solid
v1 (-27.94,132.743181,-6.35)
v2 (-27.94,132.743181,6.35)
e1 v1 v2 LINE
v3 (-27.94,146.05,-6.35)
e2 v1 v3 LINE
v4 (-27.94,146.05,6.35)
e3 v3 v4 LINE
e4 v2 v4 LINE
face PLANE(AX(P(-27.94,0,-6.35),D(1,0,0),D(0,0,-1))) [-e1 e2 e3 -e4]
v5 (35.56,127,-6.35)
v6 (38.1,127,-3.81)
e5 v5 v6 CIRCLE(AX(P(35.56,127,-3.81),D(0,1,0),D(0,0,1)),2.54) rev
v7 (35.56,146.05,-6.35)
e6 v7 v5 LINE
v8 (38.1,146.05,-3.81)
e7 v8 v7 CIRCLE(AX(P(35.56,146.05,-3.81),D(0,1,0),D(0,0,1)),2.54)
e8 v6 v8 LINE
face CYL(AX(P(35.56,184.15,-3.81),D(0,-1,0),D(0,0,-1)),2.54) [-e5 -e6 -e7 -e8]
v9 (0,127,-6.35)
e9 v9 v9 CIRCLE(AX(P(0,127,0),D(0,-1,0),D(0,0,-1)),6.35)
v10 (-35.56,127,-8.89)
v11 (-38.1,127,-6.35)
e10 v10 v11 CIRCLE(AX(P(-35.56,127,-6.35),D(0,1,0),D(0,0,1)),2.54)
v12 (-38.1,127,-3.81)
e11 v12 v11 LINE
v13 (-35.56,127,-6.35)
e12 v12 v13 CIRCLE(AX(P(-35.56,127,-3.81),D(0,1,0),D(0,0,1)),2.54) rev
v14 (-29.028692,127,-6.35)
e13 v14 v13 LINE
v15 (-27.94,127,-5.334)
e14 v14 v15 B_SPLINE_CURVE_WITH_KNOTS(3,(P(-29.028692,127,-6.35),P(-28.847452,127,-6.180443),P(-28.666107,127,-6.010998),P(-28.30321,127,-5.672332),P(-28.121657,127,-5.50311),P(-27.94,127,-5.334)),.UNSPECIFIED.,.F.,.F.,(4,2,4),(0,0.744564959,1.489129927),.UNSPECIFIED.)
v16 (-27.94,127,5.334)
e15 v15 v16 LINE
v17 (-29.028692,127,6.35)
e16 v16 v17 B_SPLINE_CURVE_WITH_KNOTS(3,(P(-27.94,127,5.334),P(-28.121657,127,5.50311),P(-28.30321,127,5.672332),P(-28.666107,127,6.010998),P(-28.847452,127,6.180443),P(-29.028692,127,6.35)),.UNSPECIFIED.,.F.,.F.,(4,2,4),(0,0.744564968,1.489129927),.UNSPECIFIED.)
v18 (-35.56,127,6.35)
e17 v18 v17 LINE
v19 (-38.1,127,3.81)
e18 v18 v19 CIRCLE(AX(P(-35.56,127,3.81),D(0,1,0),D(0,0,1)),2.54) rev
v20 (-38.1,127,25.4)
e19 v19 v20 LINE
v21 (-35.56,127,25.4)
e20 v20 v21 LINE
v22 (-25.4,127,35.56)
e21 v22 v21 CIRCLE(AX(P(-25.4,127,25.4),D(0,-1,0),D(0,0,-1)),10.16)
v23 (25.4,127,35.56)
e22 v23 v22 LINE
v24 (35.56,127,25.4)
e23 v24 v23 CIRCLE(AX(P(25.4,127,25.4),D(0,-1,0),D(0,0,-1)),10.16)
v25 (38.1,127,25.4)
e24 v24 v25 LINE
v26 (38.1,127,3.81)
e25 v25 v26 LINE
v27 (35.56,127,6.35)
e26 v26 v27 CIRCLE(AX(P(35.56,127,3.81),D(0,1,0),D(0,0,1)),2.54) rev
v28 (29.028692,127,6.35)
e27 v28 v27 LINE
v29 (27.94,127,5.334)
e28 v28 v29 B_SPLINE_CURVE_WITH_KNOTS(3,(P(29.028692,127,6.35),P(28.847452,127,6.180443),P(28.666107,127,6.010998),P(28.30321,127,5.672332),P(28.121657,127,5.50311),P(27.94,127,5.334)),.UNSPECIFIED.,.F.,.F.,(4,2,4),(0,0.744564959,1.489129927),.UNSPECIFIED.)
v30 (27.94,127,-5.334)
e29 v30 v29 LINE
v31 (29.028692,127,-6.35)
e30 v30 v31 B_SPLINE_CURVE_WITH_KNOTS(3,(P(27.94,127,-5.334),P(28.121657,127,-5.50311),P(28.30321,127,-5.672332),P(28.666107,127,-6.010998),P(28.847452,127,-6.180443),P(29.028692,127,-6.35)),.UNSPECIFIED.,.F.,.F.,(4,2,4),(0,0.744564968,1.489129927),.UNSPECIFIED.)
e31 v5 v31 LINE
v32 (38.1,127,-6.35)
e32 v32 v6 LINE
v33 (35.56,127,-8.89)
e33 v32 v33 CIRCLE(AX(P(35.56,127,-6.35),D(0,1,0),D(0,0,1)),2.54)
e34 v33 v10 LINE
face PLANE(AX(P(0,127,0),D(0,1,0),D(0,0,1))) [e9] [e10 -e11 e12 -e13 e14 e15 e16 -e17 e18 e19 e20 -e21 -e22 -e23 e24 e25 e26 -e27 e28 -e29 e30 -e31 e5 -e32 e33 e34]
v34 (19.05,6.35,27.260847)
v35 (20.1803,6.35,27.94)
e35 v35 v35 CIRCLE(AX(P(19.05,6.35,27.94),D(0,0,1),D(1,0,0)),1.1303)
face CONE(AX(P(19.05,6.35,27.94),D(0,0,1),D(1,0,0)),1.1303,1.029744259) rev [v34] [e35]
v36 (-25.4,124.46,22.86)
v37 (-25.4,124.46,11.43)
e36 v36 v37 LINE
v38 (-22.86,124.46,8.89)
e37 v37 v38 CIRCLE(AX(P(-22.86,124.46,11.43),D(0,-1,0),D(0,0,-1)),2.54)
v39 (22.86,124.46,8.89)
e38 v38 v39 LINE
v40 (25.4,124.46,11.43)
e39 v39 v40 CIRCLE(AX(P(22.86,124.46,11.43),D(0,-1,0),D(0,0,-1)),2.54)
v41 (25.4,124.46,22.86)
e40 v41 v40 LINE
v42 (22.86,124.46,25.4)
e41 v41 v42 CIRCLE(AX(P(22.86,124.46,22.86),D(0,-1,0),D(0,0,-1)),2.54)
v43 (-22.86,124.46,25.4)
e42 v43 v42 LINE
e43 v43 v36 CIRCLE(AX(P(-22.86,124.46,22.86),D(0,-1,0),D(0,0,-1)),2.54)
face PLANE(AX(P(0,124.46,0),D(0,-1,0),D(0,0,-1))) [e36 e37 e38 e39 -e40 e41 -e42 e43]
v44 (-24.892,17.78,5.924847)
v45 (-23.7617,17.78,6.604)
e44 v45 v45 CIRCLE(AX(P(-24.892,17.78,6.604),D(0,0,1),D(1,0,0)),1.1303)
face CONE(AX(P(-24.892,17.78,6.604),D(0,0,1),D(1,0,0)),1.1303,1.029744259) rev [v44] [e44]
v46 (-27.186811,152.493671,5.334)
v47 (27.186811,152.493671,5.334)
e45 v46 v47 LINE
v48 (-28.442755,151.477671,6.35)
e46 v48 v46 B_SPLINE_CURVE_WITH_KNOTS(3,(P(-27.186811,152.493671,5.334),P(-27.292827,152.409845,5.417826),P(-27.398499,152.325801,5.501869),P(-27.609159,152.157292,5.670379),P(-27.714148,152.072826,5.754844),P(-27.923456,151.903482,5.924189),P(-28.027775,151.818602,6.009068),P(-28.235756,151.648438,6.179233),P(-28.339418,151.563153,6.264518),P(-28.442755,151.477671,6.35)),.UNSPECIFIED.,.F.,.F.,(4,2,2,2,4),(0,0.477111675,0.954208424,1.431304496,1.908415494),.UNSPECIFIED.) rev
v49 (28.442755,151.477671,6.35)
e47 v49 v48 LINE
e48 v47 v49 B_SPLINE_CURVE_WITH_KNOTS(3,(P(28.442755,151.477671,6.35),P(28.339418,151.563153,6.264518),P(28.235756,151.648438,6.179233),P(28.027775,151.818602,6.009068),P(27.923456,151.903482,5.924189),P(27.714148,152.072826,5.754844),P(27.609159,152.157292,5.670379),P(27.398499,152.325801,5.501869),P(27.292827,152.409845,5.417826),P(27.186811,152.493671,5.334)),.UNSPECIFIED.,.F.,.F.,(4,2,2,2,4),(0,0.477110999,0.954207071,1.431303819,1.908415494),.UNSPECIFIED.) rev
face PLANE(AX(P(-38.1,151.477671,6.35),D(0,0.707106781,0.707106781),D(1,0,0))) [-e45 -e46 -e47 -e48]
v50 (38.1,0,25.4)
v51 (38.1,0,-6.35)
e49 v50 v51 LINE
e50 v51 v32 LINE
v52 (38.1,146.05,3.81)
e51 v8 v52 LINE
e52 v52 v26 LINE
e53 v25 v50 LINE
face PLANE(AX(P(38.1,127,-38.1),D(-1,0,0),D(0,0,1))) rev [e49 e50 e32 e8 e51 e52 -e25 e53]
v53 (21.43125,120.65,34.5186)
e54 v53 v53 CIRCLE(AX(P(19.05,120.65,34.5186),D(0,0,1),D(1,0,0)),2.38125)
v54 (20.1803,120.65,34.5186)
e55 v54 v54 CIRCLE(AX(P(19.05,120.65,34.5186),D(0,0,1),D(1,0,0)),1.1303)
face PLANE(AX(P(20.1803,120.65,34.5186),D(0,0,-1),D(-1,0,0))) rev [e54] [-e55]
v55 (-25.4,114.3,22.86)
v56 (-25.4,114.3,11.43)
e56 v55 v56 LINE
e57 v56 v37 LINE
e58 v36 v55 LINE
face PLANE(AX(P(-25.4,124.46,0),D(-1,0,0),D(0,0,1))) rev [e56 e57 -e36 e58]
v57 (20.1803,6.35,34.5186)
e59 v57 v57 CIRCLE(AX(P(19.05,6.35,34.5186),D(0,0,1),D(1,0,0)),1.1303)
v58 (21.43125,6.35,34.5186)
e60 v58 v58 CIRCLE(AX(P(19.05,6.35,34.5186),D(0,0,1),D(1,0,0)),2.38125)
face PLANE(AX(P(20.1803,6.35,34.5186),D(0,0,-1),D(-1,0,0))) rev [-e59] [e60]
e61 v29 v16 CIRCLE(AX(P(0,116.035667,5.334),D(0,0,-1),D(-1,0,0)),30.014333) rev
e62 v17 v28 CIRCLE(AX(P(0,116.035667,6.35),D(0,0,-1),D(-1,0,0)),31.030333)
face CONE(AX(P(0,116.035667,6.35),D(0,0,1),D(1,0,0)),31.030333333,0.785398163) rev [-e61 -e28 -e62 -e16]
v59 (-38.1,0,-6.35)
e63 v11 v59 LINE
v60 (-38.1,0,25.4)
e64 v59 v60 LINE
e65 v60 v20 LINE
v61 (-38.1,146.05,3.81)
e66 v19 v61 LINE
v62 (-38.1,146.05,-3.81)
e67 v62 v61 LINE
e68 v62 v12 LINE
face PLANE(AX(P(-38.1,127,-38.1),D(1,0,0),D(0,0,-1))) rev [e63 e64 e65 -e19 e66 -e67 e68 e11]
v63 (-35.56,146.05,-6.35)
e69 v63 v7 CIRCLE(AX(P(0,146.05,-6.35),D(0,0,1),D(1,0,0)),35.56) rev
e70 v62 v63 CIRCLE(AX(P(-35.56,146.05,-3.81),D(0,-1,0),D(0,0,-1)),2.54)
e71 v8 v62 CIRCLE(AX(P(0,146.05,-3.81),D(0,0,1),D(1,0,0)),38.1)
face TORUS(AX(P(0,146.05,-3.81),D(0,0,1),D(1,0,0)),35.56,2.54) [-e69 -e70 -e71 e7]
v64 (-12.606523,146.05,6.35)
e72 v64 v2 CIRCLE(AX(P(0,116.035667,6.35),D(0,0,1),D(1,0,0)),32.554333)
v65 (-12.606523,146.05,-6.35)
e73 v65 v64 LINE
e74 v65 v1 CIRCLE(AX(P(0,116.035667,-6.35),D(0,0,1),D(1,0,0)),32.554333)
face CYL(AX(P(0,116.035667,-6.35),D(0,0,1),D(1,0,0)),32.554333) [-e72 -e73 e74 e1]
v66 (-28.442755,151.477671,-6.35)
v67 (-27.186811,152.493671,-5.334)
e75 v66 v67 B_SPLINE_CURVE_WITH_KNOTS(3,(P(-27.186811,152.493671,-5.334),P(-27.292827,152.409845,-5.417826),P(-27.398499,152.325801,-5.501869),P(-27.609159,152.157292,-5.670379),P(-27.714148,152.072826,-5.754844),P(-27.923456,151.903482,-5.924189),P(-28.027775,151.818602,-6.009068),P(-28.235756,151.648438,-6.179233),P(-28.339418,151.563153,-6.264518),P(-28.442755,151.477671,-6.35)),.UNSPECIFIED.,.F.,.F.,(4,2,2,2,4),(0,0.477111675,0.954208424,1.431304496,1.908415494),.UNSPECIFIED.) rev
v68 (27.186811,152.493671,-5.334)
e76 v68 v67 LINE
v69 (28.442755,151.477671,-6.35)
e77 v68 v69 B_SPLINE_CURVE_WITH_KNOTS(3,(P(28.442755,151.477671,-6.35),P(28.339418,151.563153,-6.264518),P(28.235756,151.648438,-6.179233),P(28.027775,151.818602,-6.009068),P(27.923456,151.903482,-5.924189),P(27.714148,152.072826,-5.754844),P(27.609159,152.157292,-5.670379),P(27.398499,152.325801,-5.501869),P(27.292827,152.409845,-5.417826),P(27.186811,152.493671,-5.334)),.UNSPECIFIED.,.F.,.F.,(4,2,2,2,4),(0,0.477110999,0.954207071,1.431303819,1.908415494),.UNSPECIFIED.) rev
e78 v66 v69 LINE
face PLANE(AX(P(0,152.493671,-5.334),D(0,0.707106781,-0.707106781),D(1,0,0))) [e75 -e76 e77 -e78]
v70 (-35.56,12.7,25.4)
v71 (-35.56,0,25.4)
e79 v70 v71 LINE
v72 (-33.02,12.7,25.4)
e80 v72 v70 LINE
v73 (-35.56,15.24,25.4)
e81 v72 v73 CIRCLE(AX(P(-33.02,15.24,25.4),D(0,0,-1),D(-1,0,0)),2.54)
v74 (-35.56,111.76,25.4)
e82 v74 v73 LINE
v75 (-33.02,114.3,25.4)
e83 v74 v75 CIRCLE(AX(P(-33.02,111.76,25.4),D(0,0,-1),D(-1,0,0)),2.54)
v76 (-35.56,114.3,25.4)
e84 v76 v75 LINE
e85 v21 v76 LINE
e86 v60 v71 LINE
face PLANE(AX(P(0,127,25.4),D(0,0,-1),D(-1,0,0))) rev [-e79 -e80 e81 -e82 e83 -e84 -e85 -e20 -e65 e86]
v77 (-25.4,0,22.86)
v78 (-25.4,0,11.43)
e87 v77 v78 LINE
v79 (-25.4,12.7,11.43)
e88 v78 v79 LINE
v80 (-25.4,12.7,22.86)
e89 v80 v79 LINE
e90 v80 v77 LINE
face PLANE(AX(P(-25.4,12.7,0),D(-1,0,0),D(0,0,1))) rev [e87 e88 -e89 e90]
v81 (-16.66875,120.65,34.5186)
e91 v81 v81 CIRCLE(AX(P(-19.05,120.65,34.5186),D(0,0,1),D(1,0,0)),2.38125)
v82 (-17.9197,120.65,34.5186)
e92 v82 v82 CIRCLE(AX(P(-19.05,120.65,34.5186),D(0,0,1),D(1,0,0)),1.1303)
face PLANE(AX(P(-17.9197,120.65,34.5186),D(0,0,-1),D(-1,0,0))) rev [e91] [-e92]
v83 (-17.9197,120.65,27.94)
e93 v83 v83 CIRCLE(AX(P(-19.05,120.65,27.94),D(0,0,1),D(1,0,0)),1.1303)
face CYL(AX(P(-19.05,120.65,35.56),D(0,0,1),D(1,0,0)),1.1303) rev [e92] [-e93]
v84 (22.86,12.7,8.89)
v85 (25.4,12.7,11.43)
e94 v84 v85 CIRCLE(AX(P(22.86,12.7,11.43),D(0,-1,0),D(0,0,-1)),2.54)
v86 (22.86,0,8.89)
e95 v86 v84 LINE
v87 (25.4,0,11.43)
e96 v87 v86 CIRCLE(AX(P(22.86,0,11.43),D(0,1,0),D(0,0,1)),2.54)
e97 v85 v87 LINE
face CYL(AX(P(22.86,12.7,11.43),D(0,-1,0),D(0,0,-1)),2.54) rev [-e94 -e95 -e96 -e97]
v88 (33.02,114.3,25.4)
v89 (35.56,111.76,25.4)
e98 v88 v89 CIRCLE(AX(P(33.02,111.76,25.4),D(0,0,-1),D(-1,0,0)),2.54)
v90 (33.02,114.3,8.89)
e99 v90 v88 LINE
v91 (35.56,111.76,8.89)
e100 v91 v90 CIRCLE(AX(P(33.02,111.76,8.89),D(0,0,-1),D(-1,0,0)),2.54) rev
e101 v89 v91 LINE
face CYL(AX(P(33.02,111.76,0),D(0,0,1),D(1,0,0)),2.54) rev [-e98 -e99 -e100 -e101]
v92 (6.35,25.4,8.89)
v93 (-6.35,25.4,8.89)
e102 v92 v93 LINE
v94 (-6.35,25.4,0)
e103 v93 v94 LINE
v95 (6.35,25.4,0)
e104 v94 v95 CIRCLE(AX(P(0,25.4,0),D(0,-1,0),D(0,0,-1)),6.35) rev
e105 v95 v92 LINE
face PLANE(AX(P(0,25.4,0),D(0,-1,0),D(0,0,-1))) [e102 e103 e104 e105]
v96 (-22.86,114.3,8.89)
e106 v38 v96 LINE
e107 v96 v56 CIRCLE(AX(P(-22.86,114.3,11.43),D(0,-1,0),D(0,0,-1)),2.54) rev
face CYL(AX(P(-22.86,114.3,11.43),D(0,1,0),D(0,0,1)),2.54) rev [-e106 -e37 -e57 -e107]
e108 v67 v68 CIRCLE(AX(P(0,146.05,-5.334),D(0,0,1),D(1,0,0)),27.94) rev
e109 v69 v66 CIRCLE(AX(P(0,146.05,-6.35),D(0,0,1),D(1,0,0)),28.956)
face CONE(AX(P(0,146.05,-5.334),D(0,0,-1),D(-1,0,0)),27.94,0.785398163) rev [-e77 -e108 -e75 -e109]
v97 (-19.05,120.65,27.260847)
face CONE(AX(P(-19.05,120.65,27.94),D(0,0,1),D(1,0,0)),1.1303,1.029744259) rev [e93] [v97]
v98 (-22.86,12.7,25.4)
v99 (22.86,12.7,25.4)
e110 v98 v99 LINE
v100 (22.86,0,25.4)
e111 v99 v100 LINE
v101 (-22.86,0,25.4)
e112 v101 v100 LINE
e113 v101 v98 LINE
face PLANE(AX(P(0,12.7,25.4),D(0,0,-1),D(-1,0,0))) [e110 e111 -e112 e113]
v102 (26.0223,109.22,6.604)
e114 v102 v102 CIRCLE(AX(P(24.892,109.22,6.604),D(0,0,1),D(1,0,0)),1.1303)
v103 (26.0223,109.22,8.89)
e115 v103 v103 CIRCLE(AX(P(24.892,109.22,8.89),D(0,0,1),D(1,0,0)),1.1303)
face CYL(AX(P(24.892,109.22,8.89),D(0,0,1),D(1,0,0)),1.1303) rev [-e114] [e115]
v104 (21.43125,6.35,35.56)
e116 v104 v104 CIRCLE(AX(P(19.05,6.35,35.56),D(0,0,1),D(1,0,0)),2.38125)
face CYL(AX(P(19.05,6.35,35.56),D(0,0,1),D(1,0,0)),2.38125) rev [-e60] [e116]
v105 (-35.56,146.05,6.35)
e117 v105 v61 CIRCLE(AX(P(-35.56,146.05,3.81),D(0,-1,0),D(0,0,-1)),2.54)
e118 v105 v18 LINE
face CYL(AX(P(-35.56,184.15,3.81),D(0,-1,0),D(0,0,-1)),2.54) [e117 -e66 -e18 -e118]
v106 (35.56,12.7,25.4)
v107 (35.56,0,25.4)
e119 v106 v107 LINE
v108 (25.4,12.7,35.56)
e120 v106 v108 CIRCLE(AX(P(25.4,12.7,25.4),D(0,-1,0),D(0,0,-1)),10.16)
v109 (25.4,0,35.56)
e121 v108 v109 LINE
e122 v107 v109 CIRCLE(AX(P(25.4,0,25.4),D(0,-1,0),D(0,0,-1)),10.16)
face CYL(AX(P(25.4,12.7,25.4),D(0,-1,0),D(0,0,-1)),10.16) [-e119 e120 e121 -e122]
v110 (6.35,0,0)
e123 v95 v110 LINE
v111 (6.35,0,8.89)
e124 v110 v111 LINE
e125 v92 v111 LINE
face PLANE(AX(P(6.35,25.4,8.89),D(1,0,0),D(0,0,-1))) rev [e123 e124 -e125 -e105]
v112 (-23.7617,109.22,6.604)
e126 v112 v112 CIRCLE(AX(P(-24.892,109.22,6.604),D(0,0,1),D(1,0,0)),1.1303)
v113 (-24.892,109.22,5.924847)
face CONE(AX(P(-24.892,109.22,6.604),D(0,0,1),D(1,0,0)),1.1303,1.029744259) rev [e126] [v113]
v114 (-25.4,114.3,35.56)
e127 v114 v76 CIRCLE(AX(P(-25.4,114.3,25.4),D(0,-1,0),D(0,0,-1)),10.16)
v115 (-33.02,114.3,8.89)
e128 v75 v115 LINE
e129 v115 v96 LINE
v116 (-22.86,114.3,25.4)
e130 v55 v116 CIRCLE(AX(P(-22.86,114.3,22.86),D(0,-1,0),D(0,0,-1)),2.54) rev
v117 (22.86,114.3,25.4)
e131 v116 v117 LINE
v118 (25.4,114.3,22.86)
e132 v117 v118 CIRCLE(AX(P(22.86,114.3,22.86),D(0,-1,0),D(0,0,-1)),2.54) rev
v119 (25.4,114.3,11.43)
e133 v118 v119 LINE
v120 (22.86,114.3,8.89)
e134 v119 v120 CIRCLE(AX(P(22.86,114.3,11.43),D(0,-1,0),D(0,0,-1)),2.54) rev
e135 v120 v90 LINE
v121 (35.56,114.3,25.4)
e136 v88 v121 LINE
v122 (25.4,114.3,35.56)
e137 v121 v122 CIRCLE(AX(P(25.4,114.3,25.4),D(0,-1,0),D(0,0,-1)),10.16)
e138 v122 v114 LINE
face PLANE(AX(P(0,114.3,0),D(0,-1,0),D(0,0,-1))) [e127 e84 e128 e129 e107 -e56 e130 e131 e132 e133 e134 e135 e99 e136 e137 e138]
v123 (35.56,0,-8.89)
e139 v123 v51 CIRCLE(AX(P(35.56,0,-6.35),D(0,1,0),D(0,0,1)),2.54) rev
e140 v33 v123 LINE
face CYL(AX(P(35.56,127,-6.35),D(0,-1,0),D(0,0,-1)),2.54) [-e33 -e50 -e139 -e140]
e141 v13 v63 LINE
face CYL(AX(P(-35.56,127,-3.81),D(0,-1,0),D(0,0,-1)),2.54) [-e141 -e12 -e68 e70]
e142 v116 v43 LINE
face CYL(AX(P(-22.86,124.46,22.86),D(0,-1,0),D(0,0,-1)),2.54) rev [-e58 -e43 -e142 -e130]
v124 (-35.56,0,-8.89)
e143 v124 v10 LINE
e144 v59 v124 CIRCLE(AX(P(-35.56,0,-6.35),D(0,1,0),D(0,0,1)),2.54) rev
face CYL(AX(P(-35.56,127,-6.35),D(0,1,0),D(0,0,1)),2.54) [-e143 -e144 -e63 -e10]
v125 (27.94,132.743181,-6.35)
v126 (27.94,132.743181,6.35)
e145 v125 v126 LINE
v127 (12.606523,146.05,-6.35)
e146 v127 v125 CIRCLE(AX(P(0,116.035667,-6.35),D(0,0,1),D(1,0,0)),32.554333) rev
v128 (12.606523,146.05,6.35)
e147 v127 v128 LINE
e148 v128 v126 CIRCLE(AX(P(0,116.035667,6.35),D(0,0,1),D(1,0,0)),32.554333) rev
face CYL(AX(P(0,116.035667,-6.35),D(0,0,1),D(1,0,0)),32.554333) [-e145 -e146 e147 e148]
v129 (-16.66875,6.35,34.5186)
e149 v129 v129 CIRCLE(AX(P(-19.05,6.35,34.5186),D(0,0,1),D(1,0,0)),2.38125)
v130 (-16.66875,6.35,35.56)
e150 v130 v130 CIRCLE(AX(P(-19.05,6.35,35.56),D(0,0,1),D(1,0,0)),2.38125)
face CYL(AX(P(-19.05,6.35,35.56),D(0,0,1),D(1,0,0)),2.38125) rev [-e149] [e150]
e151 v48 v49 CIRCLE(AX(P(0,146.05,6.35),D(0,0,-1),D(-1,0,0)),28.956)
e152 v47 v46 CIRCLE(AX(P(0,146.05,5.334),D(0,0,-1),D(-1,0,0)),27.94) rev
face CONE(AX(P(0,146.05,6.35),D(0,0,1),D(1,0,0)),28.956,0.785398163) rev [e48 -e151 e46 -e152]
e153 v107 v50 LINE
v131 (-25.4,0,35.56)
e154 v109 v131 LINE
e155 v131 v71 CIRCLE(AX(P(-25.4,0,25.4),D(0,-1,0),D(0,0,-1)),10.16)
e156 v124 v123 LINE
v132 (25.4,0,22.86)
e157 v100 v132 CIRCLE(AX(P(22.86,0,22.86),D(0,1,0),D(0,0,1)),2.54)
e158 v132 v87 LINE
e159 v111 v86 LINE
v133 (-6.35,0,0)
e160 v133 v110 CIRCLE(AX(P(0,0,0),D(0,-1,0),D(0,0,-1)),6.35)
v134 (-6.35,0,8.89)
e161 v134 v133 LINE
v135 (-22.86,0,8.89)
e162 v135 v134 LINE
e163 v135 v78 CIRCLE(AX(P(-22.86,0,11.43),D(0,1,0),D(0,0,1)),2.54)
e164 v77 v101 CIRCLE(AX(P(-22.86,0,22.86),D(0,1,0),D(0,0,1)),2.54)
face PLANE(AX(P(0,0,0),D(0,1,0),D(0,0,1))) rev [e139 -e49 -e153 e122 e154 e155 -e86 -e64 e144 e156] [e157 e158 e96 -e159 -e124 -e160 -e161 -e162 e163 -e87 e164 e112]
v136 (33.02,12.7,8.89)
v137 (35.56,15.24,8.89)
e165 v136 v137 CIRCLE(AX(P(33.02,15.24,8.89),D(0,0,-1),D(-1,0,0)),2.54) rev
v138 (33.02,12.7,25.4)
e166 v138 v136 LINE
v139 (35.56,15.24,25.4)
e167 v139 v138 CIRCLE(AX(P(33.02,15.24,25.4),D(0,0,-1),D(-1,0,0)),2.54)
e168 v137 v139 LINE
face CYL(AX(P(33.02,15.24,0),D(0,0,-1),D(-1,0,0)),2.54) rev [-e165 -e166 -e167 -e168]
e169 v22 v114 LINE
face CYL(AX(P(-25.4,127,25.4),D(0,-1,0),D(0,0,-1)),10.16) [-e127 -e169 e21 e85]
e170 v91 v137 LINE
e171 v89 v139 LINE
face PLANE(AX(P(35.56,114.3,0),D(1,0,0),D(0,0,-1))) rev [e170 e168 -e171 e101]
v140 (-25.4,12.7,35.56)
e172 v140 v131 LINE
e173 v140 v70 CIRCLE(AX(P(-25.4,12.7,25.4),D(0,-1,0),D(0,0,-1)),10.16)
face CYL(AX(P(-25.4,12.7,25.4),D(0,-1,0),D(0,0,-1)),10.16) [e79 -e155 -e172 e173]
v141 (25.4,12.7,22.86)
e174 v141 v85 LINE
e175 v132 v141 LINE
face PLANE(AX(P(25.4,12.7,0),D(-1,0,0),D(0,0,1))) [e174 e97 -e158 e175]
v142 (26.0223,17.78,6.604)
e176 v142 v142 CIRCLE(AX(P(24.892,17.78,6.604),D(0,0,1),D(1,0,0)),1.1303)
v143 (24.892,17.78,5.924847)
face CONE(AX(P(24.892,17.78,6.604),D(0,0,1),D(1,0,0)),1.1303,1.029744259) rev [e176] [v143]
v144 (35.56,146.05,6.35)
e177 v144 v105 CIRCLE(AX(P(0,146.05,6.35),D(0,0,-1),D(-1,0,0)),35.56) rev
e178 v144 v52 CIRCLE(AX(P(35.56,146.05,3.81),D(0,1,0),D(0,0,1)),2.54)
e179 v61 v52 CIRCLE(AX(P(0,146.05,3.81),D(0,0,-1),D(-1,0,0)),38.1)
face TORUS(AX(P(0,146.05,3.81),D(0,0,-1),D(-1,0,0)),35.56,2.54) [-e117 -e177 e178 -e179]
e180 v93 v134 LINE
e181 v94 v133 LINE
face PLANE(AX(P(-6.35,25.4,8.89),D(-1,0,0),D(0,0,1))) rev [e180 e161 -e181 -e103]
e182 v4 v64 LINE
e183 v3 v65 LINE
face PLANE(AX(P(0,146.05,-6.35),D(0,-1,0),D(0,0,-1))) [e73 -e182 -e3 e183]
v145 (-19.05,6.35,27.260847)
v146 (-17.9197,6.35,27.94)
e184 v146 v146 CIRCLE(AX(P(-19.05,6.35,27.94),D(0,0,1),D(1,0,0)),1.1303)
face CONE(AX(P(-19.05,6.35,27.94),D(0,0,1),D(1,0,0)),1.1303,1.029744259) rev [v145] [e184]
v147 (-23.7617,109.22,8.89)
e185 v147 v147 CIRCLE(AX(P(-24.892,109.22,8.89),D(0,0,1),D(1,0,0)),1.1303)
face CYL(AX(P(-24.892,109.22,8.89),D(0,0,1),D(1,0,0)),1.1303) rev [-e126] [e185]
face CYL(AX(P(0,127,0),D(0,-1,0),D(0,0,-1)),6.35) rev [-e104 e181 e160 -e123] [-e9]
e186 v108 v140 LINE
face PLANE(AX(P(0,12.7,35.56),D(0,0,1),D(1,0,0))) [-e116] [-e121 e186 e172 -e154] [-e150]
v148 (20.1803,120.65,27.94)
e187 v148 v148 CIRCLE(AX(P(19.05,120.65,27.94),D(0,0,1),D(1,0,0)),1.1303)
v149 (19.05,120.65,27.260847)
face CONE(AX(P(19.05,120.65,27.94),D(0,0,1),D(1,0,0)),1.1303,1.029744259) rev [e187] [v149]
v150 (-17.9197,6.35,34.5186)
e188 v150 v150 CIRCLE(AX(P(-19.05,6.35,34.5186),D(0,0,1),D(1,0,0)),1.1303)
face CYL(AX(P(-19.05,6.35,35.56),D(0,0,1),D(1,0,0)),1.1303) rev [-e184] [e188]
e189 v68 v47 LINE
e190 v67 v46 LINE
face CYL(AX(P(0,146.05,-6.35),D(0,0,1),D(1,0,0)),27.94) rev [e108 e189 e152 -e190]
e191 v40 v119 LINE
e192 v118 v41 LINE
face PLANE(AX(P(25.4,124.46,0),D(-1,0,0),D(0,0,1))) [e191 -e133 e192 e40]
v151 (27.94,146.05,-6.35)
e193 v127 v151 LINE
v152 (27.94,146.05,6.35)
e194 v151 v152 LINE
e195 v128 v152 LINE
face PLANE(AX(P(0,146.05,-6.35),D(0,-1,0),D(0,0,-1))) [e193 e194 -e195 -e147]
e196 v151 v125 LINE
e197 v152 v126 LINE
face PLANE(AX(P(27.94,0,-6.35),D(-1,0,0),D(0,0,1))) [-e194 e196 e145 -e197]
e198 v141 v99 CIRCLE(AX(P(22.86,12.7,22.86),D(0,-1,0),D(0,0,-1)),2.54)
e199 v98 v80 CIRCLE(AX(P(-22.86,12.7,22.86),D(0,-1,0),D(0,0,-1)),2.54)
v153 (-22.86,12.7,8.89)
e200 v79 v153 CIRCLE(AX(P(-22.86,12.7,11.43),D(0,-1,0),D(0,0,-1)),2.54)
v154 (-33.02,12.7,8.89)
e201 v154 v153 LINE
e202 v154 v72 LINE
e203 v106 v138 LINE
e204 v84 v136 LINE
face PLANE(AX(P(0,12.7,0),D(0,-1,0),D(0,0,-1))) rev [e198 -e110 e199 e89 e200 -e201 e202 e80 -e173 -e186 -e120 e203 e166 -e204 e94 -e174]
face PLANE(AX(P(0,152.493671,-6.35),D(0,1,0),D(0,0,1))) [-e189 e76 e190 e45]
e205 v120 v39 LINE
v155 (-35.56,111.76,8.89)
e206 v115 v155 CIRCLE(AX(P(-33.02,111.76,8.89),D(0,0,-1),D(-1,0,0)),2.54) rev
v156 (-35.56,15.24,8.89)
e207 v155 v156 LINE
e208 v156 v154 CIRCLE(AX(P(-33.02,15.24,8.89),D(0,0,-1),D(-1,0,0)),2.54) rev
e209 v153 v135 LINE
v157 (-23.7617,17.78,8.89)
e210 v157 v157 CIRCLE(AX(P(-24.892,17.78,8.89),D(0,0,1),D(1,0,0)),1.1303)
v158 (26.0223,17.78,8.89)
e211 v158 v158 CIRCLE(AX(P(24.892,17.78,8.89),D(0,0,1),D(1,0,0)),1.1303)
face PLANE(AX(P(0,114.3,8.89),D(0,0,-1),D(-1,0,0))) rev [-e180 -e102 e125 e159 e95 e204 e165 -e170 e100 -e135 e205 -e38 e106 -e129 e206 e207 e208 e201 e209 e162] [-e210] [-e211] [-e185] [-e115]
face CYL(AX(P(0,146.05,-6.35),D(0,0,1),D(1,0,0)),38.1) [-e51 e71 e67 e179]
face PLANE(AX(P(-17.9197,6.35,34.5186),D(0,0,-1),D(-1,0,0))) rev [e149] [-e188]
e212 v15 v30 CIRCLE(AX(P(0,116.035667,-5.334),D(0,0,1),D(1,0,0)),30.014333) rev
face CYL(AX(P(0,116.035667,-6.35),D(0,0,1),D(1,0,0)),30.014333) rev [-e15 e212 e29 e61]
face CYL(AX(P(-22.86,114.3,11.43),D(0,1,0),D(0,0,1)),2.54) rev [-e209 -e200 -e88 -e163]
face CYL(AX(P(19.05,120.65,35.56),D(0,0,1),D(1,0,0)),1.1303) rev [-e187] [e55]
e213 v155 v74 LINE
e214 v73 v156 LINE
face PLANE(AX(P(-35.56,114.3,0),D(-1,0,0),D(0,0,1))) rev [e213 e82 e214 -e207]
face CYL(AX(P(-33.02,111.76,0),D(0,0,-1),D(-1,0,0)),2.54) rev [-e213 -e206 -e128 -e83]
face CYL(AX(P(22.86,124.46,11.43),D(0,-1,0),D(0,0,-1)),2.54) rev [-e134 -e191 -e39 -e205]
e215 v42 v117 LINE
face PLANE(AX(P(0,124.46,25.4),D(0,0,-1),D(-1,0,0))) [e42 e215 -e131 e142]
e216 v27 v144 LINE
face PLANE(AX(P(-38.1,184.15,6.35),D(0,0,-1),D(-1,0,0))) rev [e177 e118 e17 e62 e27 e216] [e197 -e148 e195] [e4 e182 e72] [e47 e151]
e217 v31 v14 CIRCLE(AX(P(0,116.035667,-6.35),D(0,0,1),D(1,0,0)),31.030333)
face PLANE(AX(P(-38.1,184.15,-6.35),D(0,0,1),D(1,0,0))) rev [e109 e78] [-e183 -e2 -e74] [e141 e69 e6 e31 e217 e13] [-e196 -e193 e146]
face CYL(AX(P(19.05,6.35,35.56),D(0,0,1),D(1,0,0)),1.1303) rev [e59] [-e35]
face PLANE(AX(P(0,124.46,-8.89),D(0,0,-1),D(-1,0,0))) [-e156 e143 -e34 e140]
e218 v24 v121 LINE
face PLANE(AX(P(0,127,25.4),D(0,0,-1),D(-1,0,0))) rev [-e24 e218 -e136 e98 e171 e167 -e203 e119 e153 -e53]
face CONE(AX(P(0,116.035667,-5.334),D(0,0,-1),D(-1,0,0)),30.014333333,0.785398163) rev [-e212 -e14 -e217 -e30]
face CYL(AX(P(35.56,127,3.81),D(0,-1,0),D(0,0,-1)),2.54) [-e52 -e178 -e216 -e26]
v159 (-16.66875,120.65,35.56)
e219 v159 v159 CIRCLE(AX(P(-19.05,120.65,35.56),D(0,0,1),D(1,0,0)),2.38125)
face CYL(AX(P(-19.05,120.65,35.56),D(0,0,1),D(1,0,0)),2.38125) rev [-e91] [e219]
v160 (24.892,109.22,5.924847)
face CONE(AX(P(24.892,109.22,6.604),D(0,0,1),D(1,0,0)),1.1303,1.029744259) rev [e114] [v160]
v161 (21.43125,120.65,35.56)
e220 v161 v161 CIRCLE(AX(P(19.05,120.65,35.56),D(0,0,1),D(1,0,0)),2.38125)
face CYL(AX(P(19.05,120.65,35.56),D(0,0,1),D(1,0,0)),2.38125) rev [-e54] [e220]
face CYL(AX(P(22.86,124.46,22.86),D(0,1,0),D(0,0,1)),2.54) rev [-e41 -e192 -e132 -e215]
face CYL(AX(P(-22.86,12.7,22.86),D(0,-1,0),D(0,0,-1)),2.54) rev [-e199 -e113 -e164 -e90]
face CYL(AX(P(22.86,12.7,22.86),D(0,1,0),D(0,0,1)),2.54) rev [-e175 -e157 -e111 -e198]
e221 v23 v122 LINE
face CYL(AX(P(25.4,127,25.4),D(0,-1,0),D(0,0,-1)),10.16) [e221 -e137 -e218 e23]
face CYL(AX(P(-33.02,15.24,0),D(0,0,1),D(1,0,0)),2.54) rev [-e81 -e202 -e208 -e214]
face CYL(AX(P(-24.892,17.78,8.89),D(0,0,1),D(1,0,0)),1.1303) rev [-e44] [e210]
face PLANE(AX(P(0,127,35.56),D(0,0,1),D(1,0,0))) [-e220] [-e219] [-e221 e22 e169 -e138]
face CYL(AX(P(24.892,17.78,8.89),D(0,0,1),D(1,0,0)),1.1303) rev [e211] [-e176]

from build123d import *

# Parameters (mm, degrees)
BOSS_EXTRUDE1_DEPTH                                 = 127
FILLET1_R                                           = 12.7
SKETCH2_W                                           = 76.20000000000002
SKETCH2_H                                           = 12.700000000000003
BOSS_EXTRUDE6_DEPTH                                 = 57.15
CUT_EXTRUDE2_DEPTH                                  = 12.7
CUT_EXTRUDE7_START                                  = -127
CUT_EXTRUDE7_DEPTH                                  = 127
CUT_EXTRUDE8_START                                  = -114.3
CUT_EXTRUDE8_DEPTH                                  = 114.3
CUT_EXTRUDE9_DEPTH                                  = 124.46000000000001
CUT_EXTRUDE10_DEPTH                                 = 114.3
CUT_EXTRUDE11_DEPTH                                 = 124.46000000000001
SKETCH6_12_R                                        = 6.350000000000001
CUT_EXTRUDE12_DEPTH                                 = 127
BOSS_EXTRUDE7_DEPTH                                 = 12.7
BOSS_EXTRUDE8_START                                 = -12.7
BOSS_EXTRUDE8_DEPTH                                 = 12.7
CBORE_FOR_1_BINDING_HEAD_MACHINE_SCREW1_D           = 2.2606
CBORE_FOR_1_BINDING_HEAD_MACHINE_SCREW1_DEPTH       = 7.62
CBORE_FOR_1_BINDING_HEAD_MACHINE_SCREW1_CBORE_D     = 4.7625
CBORE_FOR_1_BINDING_HEAD_MACHINE_SCREW1_CBORE_DEPTH = 1.0414
CBORE_FOR_1_BINDING_HEAD_MACHINE_SCREW1_TIP         = 0.6791527576868515
CUT_EXTRUDE13_DEPTH                                 = 127
FILLET5_R                                           = 2.54
FILLET6_R                                           = 2.54
CHAMFER1_SIZE                                       = 1.016
CHAMFER2_SIZE                                       = 1.016
CUT_EXTRUDE14_DEPTH                                 = 25.4
FILLET7_R                                           = 2.54
FILLET8_R                                           = 2.54
FILLET9_R                                           = 2.54
F_4_40_TAPPED_HOLE1_D                               = 2.2606
F_4_40_TAPPED_HOLE1_DEPTH                           = 2.286
F_4_40_TAPPED_HOLE1_TIP                             = 0.6791527576868515


with BuildPart() as part:
    # Sketch1 → Boss-Extrude1 (new body)
    with BuildSketch(Plane(origin=(0, 0, 0), x_dir=(1, 0, 0), z_dir=(0, 1, 0))):
        Polygon((-38.10000000000001, 38.100000000000016), (38.099999999999994, 38.100000000000016), (38.10000000000001, -38.09999999999999), (-38.099999999999994, -38.09999999999999), align=None)
    extrude(amount=BOSS_EXTRUDE1_DEPTH)

    # Fillet1
    fillet1_edges = [part.edges().sort_by_distance(p)[0] for p in [
        (38.10000000000001, 63.5, 38.09999999999999),
        (-38.099999999999994, 63.5, 38.09999999999999),
        (-38.10000000000001, 63.5, -38.100000000000016),
        (38.099999999999994, 63.5, -38.100000000000016),
    ]]
    fillet(fillet1_edges, radius=FILLET1_R)

    # Sketch2 → Boss-Extrude6 (add)
    with BuildSketch(Plane(origin=(0, 127, 0), x_dir=(1, 0, 0), z_dir=(0, 1, 0))):
        Rectangle(SKETCH2_W, SKETCH2_H)
    extrude(amount=BOSS_EXTRUDE6_DEPTH)

    # Sketch5 → Cut-Extrude2 (cut)
    with BuildSketch(Plane.XY.offset(6.350000000000001)):
        with BuildLine():
            Line((-38.10000000000001, 184.15), (-38.1, 146.05))
            ThreePointArc((-38.1, 146.05), (-26.940768363207475, 172.99076836320748), (-2.24e-15, 184.15000000000003))
            Line((0, 184.15), (-38.10000000000001, 184.15))
        make_face()
        with BuildLine():
            ThreePointArc((-3.5001e-13, 173.99), (-17.329273526921128, 167.96665756973795), (-27.186811297197842, 152.49367065348287))
            Line((-27.186811297197842, 152.49367065348287), (3.88e-15, 152.49367065348287))
            Line((3.88e-15, 152.49367065348287), (1.24e-15, 173.99))
        make_face()
        with BuildLine():
            Line((1.24e-15, 173.99), (3.88e-15, 152.49367065348287))
            Line((3.88e-15, 152.49367065348287), (27.18681129719785, 152.49367065348287))
            ThreePointArc((27.18681129719785, 152.49367065348287), (17.329273526920858, 167.96665756973817), (-3.5001e-13, 173.99))
        make_face()
        with BuildLine():
            Line((-27.940000000000005, 146.05), (-27.940000000000005, 132.74318050857906))
            ThreePointArc((-27.94000000000131, 132.7431805085794), (-21.33712693880746, 140.62248493937113), (-12.606522650330419, 146.05000000000067))
            Line((-12.606522650330286, 146.05), (-27.940000000000005, 146.05))
        make_face()
        with BuildLine():
            ThreePointArc((12.606522650330444, 146.05000000000067), (21.337126938807486, 140.62248493937113), (27.940000000001312, 132.7431805085794))
            Line((27.940000000000012, 132.74318050857906), (27.940000000000012, 146.05))
            Line((27.940000000000012, 146.05), (12.606522650330312, 146.05))
        make_face()
        with BuildLine():
            ThreePointArc((4.67e-15, 146.05), (-16.908179233731822, 140.83432954280667), (-27.939999999999998, 127))
            Line((-27.940000000000005, 127), (27.940000000000012, 127))
            ThreePointArc((27.94, 127), (16.90817923373183, 140.83432954280667), (4.67e-15, 146.05))
        make_face()
        with BuildLine():
            ThreePointArc((-2.24e-15, 184.15000000000003), (26.940768363207454, 172.9907683632075), (38.09999999999999, 146.05))
            Line((38.10000000000001, 146.05), (38.10000000000001, 184.15))
            Line((38.10000000000001, 184.15), (0, 184.15))
        make_face()
    extrude(amount=-CUT_EXTRUDE2_DEPTH, mode=Mode.SUBTRACT)

    # Sketch6 → Cut-Extrude7 (cut)
    with BuildSketch(Plane.XZ.offset(CUT_EXTRUDE7_START)):
        with BuildLine():
            ThreePointArc((-25.400000000000002, 38.09999999999999), (-34.380256121069166, 34.38025612106913), (-38.099999999999994, 25.399999999999956))
            Line((-38.099999999999994, 25.399999999999956), (-35.559999999999995, 25.399999999999956))
            ThreePointArc((-35.559999999999995, 25.399999999999956), (-32.58420489685533, 32.5842048968553), (-25.400000000000002, 35.55999999999999))
            Line((-25.400000000000002, 35.55999999999999), (25.39999999999998, 35.55999999999999))
            ThreePointArc((25.39999999999998, 35.55999999999999), (32.58420489685533, 32.58420489685531), (35.56000000000001, 25.39999999999996))
            Line((35.56, 25.399999999999956), (38.10000000000001, 25.399999999999956))
            ThreePointArc((38.10000000000001, 25.399999999999956), (34.38025612106916, 34.38025612106914), (25.399999999999977, 38.09999999999998))
            Line((25.399999999999977, 38.09999999999999), (-25.400000000000006, 38.09999999999999))
        make_face()
    extrude(amount=CUT_EXTRUDE7_DEPTH, mode=Mode.SUBTRACT)

    # Sketch6<7> → Cut-Extrude8 (cut)
    with BuildSketch(Plane.XZ.offset(CUT_EXTRUDE8_START)):
        with BuildLine():
            ThreePointArc((-25.400000000000002, 35.55999999999999), (-32.58420489685533, 32.5842048968553), (-35.559999999999995, 25.399999999999956))
            Line((-35.559999999999995, 25.399999999999956), (-25.4, 25.399999999999956))
            Line((-25.4, 25.399999999999956), (25.400000000000006, 25.399999999999956))
            Line((25.400000000000006, 25.399999999999956), (35.56, 25.399999999999956))
            ThreePointArc((35.56000000000001, 25.39999999999996), (32.58420489685533, 32.58420489685531), (25.39999999999998, 35.55999999999999))
            Line((25.39999999999998, 35.55999999999999), (-25.400000000000002, 35.55999999999999))
        make_face()
    extrude(amount=CUT_EXTRUDE8_DEPTH, mode=Mode.SUBTRACT)

    # Sketch6<8> → Cut-Extrude9 (cut)
    with BuildSketch(Plane.XZ):
        with BuildLine():
            Line((35.55999999999999, -8.889999999999985), (-35.55999999999999, -8.889999999999999))
            Line((-35.56, -8.89), (-35.56000000000001, -25.400000000000013))
            ThreePointArc((-35.56000000000001, -25.400000000000016), (-32.58420489685533, -32.58420489685534), (-25.400000000000006, -35.56000000000002))
            Line((-25.400000000000006, -35.56000000000002), (25.399999999999963, -35.56000000000002))
            ThreePointArc((25.399999999999967, -35.56000000000002), (32.584204896855304, -32.58420489685535), (35.559999999999995, -25.40000000000002))
            Line((35.559999999999995, -25.40000000000002), (35.56, -8.889999999999986))
        make_face()
    extrude(amount=-CUT_EXTRUDE9_DEPTH, mode=Mode.SUBTRACT)

    # Sketch6<9> → Cut-Extrude10 (cut)
    with BuildSketch(Plane.XZ):
        Polygon((-25.4, 25.399999999999956), (-35.559999999999995, 25.399999999999956), (-35.56, 8.89), (-25.4, 8.89), align=None)
        Polygon((35.56, 25.399999999999956), (25.400000000000006, 25.399999999999956), (25.400000000000006, 8.890000000000008), (35.559999999999995, 8.890000000000013), align=None)
    extrude(amount=-CUT_EXTRUDE10_DEPTH, mode=Mode.SUBTRACT)

    # Sketch6<10> → Cut-Extrude11 (cut)
    with BuildSketch(Plane.XZ):
        Polygon((25.400000000000006, 25.399999999999956), (-25.4, 25.399999999999956), (-25.4, 8.890000000000004), (25.400000000000006, 8.890000000000011), align=None)
    extrude(amount=-CUT_EXTRUDE11_DEPTH, mode=Mode.SUBTRACT)

    # Sketch6<12> → Cut-Extrude12 (cut)
    with BuildSketch(Plane.XZ):
        with Locations(Location((0, 0, 0), (0, 0, 270))):
            Circle(SKETCH6_12_R)
    extrude(amount=-CUT_EXTRUDE12_DEPTH, mode=Mode.SUBTRACT)

    # Sketch6<13> → Boss-Extrude7 (add)
    with BuildSketch(Plane.XZ):
        Polygon((-25.4, 25.399999999999956), (-35.559999999999995, 25.399999999999956), (-35.56, 8.89), (-25.4, 8.89), align=None)
        Polygon((35.56, 25.399999999999956), (25.400000000000006, 25.399999999999956), (25.400000000000006, 8.890000000000008), (35.559999999999995, 8.890000000000013), align=None)
    extrude(amount=-BOSS_EXTRUDE7_DEPTH)

    # Sketch6<14> → Boss-Extrude8 (add)
    with BuildSketch(Plane.XZ.offset(BOSS_EXTRUDE8_START)):
        with BuildLine():
            ThreePointArc((-25.400000000000002, 35.55999999999999), (-32.58420489685533, 32.5842048968553), (-35.559999999999995, 25.399999999999956))
            Line((-35.559999999999995, 25.399999999999956), (-25.4, 25.399999999999956))
            Line((-25.4, 25.399999999999956), (25.400000000000006, 25.399999999999956))
            Line((25.400000000000006, 25.399999999999956), (35.56, 25.399999999999956))
            ThreePointArc((35.56000000000001, 25.39999999999996), (32.58420489685533, 32.58420489685531), (25.39999999999998, 35.55999999999999))
            Line((25.39999999999998, 35.55999999999999), (-25.400000000000002, 35.55999999999999))
        make_face()
    extrude(amount=BOSS_EXTRUDE8_DEPTH)

    # CBORE for #1 Binding Head Machine Screw1
    with Locations(Plane.XY.offset(35.55999999999999)):
        with Locations((-19.05, 120.65), (19.05, 120.65), (-19.05, 6.35), (19.05, 6.35)):
            CounterBoreHole(CBORE_FOR_1_BINDING_HEAD_MACHINE_SCREW1_D / 2, CBORE_FOR_1_BINDING_HEAD_MACHINE_SCREW1_CBORE_D / 2, CBORE_FOR_1_BINDING_HEAD_MACHINE_SCREW1_CBORE_DEPTH, depth=CBORE_FOR_1_BINDING_HEAD_MACHINE_SCREW1_DEPTH)
            with Locations((0, 0, -(CBORE_FOR_1_BINDING_HEAD_MACHINE_SCREW1_DEPTH + CBORE_FOR_1_BINDING_HEAD_MACHINE_SCREW1_TIP / 2))):  # 118° drill point
                Cone(0, CBORE_FOR_1_BINDING_HEAD_MACHINE_SCREW1_D / 2, CBORE_FOR_1_BINDING_HEAD_MACHINE_SCREW1_TIP, mode=Mode.SUBTRACT)

    # Sketch9 → Cut-Extrude13 (cut)
    with BuildSketch(Plane.XZ):
        Polygon((-35.55999999999999, -8.889999999999999), (-38.1, -8.889999999999999), (-38.1, -39.454252630165286), (40.84777292186545, -39.454252630165286), (40.84777292186545, -8.889999999999992), align=None)
    extrude(amount=-CUT_EXTRUDE13_DEPTH, mode=Mode.SUBTRACT)

    # Fillet5
    fillet5_edges = [part.edges().sort_by_distance(p)[0] for p in [
        (-38.1, 63.5, -8.889999999999999),
        (38.10000000000001, 63.5, -8.89),
    ]]
    fillet(fillet5_edges, radius=FILLET5_R)

    # Fillet6
    fillet6_edges = [part.edges().sort_by_distance(p)[0] for p in [
        (-38.10000000000001, 136.525, -6.350000000000001),
        (-38.10000000000001, 136.525, 6.350000000000001),
        (-1.44e-15, 184.15000000000003, -6.349999999999998),
        (-1.44e-15, 184.15000000000003, 6.350000000000001),
        (38.10000000000001, 136.525, -6.350000000000001),
        (38.10000000000001, 136.525, 6.350000000000001),
    ]]
    fillet(fillet6_edges, radius=FILLET6_R)

    # Chamfer1
    chamfer1_edges = [part.edges().sort_by_distance(p)[0] for p in [
        (-2.043e-14, 173.99, 6.350000000000001),
        (7.11e-15, 152.49367065348287, 6.350000000000001),
        (5.24e-14, 173.99, -6.349999999999998),
        (3.55e-15, 152.49367065348287, -6.349999999999998),
    ]]
    chamfer(chamfer1_edges, length=CHAMFER1_SIZE)

    # Chamfer2
    chamfer2_edges = [part.edges().sort_by_distance(p)[0] for p in [
        (8.88e-15, 146.05, 6.350000000000001),
        (-1.599e-14, 146.05, -6.349999999999998),
    ]]
    chamfer(chamfer2_edges, length=CHAMFER2_SIZE)

    # Sketch10 → Cut-Extrude14 (cut)
    with BuildSketch(Plane.XZ):
        with BuildLine():
            Line((6.349999999999994, 8.890000000000008), (-6.350000000000005, 8.890000000000004))
            Line((-6.350000000000005, 8.890000000000004), (-6.350000000000002, 0))
            ThreePointArc((-6.350000000000002, 0), (3.9e-16, -6.350000000000001), (6.350000000000002, 0))
            Line((6.350000000000002, 0), (6.349999999999994, 8.890000000000008))
        make_face()
    extrude(amount=-CUT_EXTRUDE14_DEPTH, mode=Mode.SUBTRACT)

    # Fillet7
    fillet7_edges = [part.edges().sort_by_distance(p)[0] for p in [
        (-25.4, 6.35, 25.39999999999997),
        (-25.4, 6.35, 8.890000000000002),
        (25.400000000000006, 6.35, 8.89000000000001),
        (25.400000000000006, 6.35, 25.39999999999997),
    ]]
    fillet(fillet7_edges, radius=FILLET7_R)

    # Fillet8
    fillet8_edges = [part.edges().sort_by_distance(p)[0] for p in [
        (-25.4, 119.38, 8.890000000000002),
        (-25.4, 119.38, 25.39999999999997),
        (25.400000000000006, 119.38, 25.39999999999997),
        (25.400000000000006, 119.38, 8.89000000000001),
    ]]
    fillet(fillet8_edges, radius=FILLET8_R)

    # Fillet9
    # the kernel refuses this fillet: 2.54 mm, written as the material it adds along each edge
    with BuildSketch(Plane(origin=(-35.559999999999995, 114.3, 25.399999999999956), x_dir=(1, 0, -4.3e-16), z_dir=(-4.3e-16, 0, -1))) as fillet9_piece_1:
        with BuildLine():
            CenterArc((FILLET9_R, FILLET9_R), FILLET9_R, 180, 90)
            Line((0, FILLET9_R), (0, 0))
            Line((0, 0), (FILLET9_R, 0))
        make_face()
    extrude(amount=22.85999999999997)
    with BuildSketch(Plane(origin=(35.56, 114.3, 2.539999999999999), x_dir=(-1, 0, 4.3e-16), z_dir=(4.3e-16, 0, 1))) as fillet9_piece_2:
        with BuildLine():
            CenterArc((FILLET9_R, FILLET9_R), FILLET9_R, 180, 90)
            Line((-7.11e-15, FILLET9_R), (0, 0))
            Line((0, 0), (FILLET9_R, 0))
        make_face()
    extrude(amount=22.859999999999964)
    with BuildSketch(Plane(origin=(-35.559999999999995, 12.7, 25.399999999999956), x_dir=(0, 1, 0), z_dir=(-4.3e-16, 0, -1))) as fillet9_piece_3:
        with BuildLine():
            CenterArc((FILLET9_R, FILLET9_R), FILLET9_R, 180, 90)
            Line((0, FILLET9_R), (0, 0))
            Line((0, 0), (FILLET9_R, 0))
        make_face()
    extrude(amount=22.85999999999997)
    with BuildSketch(Plane(origin=(35.56, 12.7, 2.540000000000017), x_dir=(-1, 0, 4.3e-16), z_dir=(4.3e-16, 0, 1))) as fillet9_piece_4:
        with BuildLine():
            CenterArc((FILLET9_R, -FILLET9_R), FILLET9_R, 90, 90)
            Line((0, -FILLET9_R), (0, 0))
            Line((0, 0), (FILLET9_R, 0))
        make_face()
    extrude(amount=22.859999999999946)

    # #4-40 Tapped Hole1
    with Locations(Plane.XY.offset(8.890000000000006)):
        with Locations((-24.892, 109.22), (24.892, 109.22), (-24.892, 17.78), (24.892, 17.78)):
            Hole(F_4_40_TAPPED_HOLE1_D / 2, depth=F_4_40_TAPPED_HOLE1_DEPTH)
            with Locations((0, 0, -(F_4_40_TAPPED_HOLE1_DEPTH + F_4_40_TAPPED_HOLE1_TIP / 2))):  # 118° drill point
                Cone(0, F_4_40_TAPPED_HOLE1_D / 2, F_4_40_TAPPED_HOLE1_TIP, mode=Mode.SUBTRACT)


solid = part.part
